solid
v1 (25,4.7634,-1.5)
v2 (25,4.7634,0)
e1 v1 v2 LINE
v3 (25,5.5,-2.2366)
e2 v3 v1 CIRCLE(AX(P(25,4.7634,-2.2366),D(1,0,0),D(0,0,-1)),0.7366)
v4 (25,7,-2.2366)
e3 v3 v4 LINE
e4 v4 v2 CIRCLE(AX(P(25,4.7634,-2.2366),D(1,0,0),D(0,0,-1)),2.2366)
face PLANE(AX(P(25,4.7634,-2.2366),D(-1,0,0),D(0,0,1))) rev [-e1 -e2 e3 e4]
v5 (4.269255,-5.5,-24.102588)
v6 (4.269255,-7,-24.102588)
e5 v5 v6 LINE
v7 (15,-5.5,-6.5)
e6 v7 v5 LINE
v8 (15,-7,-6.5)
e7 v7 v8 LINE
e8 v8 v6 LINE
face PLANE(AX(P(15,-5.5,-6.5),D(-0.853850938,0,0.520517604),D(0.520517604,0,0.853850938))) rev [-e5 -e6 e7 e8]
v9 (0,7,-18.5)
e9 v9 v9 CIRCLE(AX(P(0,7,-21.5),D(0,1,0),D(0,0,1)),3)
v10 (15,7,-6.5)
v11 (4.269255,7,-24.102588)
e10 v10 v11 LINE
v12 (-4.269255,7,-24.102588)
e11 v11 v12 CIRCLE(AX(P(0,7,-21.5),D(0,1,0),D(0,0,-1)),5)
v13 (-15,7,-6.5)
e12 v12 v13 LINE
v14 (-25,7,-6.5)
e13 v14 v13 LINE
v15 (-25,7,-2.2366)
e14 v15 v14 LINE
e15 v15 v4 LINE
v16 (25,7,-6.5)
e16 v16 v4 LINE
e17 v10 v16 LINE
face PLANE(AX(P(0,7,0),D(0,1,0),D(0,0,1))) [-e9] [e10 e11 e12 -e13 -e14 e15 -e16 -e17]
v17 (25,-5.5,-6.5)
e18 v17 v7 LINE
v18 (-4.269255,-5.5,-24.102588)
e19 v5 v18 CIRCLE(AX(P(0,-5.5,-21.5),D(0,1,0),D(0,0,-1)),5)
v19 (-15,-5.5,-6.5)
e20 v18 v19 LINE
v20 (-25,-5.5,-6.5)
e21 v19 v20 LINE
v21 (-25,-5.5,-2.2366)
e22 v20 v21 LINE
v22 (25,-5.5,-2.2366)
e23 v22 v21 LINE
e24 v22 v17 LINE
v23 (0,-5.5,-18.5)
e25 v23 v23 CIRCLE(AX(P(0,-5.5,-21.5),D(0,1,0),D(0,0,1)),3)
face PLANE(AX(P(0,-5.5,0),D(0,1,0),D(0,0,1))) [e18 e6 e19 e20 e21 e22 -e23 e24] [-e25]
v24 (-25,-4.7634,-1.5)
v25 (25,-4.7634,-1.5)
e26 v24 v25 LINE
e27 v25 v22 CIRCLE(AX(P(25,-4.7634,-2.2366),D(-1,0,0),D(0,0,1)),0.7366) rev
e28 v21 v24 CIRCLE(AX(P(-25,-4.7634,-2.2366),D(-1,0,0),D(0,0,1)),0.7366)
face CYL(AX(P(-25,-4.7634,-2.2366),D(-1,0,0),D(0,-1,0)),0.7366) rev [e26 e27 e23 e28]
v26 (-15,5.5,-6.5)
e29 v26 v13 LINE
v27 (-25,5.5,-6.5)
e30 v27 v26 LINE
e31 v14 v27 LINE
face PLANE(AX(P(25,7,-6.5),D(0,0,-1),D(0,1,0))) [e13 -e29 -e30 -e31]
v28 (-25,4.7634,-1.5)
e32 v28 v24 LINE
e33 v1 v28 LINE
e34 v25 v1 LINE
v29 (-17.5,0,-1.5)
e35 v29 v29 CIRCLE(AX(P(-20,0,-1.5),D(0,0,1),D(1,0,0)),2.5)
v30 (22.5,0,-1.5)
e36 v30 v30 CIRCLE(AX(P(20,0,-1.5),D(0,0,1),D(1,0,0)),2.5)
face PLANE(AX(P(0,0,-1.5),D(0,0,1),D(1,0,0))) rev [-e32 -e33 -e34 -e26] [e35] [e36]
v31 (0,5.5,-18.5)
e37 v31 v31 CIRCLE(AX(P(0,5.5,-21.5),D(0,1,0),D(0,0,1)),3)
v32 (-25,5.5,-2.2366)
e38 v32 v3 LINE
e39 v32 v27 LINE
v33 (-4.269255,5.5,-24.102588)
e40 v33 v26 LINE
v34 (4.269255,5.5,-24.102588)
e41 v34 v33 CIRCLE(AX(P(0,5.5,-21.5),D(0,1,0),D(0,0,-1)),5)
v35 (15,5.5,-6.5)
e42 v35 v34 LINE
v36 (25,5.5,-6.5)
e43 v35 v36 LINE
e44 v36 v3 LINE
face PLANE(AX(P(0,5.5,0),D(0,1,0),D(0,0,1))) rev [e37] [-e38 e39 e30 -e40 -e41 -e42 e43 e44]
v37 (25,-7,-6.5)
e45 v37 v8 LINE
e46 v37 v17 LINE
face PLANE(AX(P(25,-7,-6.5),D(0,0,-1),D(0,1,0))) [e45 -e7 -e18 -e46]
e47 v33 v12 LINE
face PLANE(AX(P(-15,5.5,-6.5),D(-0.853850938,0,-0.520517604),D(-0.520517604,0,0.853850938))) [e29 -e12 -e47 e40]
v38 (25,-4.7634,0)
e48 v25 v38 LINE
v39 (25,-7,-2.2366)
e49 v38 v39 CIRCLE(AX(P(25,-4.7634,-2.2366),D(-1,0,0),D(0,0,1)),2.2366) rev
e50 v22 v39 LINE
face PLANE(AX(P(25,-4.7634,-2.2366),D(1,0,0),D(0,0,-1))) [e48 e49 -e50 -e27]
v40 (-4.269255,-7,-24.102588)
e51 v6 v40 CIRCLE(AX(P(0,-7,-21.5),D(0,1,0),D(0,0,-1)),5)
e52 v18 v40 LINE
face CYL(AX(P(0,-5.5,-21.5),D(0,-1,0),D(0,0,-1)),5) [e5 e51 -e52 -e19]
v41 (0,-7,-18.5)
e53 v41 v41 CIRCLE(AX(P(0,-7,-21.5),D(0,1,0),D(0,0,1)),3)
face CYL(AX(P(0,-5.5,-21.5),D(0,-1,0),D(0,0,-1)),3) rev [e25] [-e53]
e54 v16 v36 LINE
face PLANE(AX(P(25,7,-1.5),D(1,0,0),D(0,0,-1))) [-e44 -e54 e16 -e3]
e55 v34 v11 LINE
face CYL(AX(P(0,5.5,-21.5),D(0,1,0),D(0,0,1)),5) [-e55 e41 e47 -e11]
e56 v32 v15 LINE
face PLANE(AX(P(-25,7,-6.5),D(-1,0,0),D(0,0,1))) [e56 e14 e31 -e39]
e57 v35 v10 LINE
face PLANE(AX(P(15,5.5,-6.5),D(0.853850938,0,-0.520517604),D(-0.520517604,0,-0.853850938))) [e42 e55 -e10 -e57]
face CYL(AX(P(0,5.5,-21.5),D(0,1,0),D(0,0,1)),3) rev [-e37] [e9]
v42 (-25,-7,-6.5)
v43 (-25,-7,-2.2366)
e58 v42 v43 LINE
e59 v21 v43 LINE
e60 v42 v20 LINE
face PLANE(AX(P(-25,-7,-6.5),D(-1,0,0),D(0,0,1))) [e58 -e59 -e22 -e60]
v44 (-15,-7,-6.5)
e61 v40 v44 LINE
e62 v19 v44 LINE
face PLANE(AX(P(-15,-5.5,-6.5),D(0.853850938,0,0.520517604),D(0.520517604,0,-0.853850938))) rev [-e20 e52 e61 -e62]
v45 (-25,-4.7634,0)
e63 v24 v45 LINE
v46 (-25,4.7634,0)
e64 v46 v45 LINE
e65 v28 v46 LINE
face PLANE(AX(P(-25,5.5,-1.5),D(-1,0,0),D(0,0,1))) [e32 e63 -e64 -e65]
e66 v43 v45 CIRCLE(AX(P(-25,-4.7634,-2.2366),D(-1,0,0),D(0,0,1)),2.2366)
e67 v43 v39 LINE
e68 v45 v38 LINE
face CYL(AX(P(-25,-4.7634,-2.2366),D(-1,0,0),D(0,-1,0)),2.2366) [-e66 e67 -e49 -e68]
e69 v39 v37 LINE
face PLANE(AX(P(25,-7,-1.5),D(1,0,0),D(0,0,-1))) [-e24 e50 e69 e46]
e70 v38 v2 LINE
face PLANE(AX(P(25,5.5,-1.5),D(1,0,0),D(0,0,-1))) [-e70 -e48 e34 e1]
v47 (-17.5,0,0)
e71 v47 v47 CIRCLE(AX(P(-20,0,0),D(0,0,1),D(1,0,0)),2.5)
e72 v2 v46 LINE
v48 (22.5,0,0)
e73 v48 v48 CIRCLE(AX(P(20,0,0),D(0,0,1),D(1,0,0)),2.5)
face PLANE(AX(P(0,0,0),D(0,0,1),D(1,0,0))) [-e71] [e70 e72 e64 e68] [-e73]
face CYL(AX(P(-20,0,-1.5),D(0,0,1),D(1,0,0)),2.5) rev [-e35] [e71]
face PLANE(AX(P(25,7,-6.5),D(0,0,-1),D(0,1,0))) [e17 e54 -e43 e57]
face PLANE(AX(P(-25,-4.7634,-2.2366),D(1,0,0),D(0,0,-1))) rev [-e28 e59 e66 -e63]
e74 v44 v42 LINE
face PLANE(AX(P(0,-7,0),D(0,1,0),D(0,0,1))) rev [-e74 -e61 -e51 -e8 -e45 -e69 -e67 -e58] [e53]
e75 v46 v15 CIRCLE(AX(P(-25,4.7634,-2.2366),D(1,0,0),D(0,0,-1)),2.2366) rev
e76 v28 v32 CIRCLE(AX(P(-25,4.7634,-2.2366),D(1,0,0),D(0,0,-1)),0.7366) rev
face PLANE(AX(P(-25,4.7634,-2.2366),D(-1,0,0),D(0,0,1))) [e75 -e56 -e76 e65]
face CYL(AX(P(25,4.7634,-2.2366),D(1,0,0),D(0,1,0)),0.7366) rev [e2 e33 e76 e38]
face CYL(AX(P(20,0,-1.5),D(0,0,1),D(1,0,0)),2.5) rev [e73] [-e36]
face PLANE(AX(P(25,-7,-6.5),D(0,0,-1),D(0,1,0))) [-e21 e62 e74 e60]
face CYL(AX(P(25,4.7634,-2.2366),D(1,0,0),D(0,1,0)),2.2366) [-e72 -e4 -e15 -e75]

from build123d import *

# Parameters (mm, degrees)
SKETCH1_W                      = 50
SKETCH1_H                      = 11
SKETCH1_R                      = 2.5
BASE_FLANGE1_DEPTH             = 1.5
EDGE_FLANGE1_STRIP_W           = 7.4732
EDGE_FLANGE1_STRIP_H           = 1.5
EDGE_FLANGE1_STRIP_CUT_DEPTH   = 50
EDGE_FLANGE1_STRIP_2_W         = 7.4732
EDGE_FLANGE1_STRIP_2_H         = 1.5
EDGE_FLANGE1_STRIP_CUT_2_DEPTH = 50
EDGE_FLANGE1_DEPTH             = 50
EDGE_FLANGE1_BEND_DEPTH        = 50
SKETCH10_R                     = 3
TAB2_DEPTH                     = 1.5


# Sheet-metal steps are written as plain solids
with BuildPart() as part:
    # Sketch1 → Base-Flange1 (new body)
    with BuildSketch(Plane.XY):
        Rectangle(SKETCH1_W, SKETCH1_H)
        with Locations((-20, 0)):
            Circle(SKETCH1_R, mode=Mode.SUBTRACT)
        with Locations((20, 0)):
            Circle(SKETCH1_R, mode=Mode.SUBTRACT)
    extrude(amount=-BASE_FLANGE1_DEPTH)

    # Edge-Flange1 strip (across the edge) → Edge-Flange1 strip cut (cut)
    with BuildSketch(Plane(origin=(-25, 5.5, -1.5), x_dir=(0, -1, 0), z_dir=(1, 0, 0))):
        with Locations((-3, -0.75)):
            Rectangle(EDGE_FLANGE1_STRIP_W, EDGE_FLANGE1_STRIP_H)
    extrude(amount=EDGE_FLANGE1_STRIP_CUT_DEPTH, mode=Mode.SUBTRACT)

    # Edge-Flange1 strip 2 (across the edge) → Edge-Flange1 strip cut 2 (cut)
    with BuildSketch(Plane(origin=(25, -5.5, -1.5), x_dir=(0, 1, 0), z_dir=(-1, 0, 0))):
        with Locations((-3, -0.75)):
            Rectangle(EDGE_FLANGE1_STRIP_2_W, EDGE_FLANGE1_STRIP_2_H)
    extrude(amount=EDGE_FLANGE1_STRIP_CUT_2_DEPTH, mode=Mode.SUBTRACT)

    # Edge-Flange1 section (across the edge) → Edge-Flange1 (add)
    with BuildSketch(Plane(origin=(-25, 5.5, -1.5), x_dir=(0, -1, 0), z_dir=(1, 0, 0))):
        with BuildLine():
            Line((-1.5, 0.7366), (-1.5, 5))
            Line((-1.5, 5), (0, 5))
            Line((0, 5), (0, 0.7366))
            ThreePointArc((0, 0.7366), (0.215745145, 0.215745145), (0.7366, 0))
            Line((0.7366, 0), (0.7366, -1.5))
            ThreePointArc((0.7366, -1.5), (-0.844915027, -0.844915027), (-1.5, 0.7366))
        make_face()
    extrude(amount=EDGE_FLANGE1_DEPTH)

    # Edge-Flange1 section 2 (across the edge) → Edge-Flange1 bend (add)
    with BuildSketch(Plane(origin=(25, -5.5, -1.5), x_dir=(0, 1, 0), z_dir=(-1, 0, 0))):
        with BuildLine():
            Line((-1.5, 0.7366), (-1.5, 5))
            Line((-1.5, 5), (0, 5))
            Line((0, 5), (0, 0.7366))
            ThreePointArc((0, 0.7366), (0.215745145, 0.215745145), (0.7366, 0))
            Line((0.7366, 0), (0.7366, -1.5))
            ThreePointArc((0.7366, -1.5), (-0.844915027, -0.844915027), (-1.5, 0.7366))
        make_face()
    extrude(amount=EDGE_FLANGE1_BEND_DEPTH)

    # Sketch10 → Tab2 (add)
    with BuildSketch(Plane(origin=(0, 7, 0), x_dir=(1, 0, 0), z_dir=(0, 1, 0))):
        with BuildLine():
            Line((-15, 6.5), (-4.269254688, 24.102588021))
            ThreePointArc((-4.269254688, 24.102588021), (0, 26.5), (4.269254688, 24.102588021))
            Line((4.269254688, 24.102588021), (15, 6.5))
            Line((15, 6.5), (-15, 6.5))
        make_face()
        with Locations(Location((0, 21.5, 0), (0, 0, 270))):
            Circle(SKETCH10_R, mode=Mode.SUBTRACT)
    tab2 = extrude(amount=-TAB2_DEPTH)

    # Mirror1: Tab2 across plane
    add(tab2.mirror(Plane.ZX))


solid = part.part
